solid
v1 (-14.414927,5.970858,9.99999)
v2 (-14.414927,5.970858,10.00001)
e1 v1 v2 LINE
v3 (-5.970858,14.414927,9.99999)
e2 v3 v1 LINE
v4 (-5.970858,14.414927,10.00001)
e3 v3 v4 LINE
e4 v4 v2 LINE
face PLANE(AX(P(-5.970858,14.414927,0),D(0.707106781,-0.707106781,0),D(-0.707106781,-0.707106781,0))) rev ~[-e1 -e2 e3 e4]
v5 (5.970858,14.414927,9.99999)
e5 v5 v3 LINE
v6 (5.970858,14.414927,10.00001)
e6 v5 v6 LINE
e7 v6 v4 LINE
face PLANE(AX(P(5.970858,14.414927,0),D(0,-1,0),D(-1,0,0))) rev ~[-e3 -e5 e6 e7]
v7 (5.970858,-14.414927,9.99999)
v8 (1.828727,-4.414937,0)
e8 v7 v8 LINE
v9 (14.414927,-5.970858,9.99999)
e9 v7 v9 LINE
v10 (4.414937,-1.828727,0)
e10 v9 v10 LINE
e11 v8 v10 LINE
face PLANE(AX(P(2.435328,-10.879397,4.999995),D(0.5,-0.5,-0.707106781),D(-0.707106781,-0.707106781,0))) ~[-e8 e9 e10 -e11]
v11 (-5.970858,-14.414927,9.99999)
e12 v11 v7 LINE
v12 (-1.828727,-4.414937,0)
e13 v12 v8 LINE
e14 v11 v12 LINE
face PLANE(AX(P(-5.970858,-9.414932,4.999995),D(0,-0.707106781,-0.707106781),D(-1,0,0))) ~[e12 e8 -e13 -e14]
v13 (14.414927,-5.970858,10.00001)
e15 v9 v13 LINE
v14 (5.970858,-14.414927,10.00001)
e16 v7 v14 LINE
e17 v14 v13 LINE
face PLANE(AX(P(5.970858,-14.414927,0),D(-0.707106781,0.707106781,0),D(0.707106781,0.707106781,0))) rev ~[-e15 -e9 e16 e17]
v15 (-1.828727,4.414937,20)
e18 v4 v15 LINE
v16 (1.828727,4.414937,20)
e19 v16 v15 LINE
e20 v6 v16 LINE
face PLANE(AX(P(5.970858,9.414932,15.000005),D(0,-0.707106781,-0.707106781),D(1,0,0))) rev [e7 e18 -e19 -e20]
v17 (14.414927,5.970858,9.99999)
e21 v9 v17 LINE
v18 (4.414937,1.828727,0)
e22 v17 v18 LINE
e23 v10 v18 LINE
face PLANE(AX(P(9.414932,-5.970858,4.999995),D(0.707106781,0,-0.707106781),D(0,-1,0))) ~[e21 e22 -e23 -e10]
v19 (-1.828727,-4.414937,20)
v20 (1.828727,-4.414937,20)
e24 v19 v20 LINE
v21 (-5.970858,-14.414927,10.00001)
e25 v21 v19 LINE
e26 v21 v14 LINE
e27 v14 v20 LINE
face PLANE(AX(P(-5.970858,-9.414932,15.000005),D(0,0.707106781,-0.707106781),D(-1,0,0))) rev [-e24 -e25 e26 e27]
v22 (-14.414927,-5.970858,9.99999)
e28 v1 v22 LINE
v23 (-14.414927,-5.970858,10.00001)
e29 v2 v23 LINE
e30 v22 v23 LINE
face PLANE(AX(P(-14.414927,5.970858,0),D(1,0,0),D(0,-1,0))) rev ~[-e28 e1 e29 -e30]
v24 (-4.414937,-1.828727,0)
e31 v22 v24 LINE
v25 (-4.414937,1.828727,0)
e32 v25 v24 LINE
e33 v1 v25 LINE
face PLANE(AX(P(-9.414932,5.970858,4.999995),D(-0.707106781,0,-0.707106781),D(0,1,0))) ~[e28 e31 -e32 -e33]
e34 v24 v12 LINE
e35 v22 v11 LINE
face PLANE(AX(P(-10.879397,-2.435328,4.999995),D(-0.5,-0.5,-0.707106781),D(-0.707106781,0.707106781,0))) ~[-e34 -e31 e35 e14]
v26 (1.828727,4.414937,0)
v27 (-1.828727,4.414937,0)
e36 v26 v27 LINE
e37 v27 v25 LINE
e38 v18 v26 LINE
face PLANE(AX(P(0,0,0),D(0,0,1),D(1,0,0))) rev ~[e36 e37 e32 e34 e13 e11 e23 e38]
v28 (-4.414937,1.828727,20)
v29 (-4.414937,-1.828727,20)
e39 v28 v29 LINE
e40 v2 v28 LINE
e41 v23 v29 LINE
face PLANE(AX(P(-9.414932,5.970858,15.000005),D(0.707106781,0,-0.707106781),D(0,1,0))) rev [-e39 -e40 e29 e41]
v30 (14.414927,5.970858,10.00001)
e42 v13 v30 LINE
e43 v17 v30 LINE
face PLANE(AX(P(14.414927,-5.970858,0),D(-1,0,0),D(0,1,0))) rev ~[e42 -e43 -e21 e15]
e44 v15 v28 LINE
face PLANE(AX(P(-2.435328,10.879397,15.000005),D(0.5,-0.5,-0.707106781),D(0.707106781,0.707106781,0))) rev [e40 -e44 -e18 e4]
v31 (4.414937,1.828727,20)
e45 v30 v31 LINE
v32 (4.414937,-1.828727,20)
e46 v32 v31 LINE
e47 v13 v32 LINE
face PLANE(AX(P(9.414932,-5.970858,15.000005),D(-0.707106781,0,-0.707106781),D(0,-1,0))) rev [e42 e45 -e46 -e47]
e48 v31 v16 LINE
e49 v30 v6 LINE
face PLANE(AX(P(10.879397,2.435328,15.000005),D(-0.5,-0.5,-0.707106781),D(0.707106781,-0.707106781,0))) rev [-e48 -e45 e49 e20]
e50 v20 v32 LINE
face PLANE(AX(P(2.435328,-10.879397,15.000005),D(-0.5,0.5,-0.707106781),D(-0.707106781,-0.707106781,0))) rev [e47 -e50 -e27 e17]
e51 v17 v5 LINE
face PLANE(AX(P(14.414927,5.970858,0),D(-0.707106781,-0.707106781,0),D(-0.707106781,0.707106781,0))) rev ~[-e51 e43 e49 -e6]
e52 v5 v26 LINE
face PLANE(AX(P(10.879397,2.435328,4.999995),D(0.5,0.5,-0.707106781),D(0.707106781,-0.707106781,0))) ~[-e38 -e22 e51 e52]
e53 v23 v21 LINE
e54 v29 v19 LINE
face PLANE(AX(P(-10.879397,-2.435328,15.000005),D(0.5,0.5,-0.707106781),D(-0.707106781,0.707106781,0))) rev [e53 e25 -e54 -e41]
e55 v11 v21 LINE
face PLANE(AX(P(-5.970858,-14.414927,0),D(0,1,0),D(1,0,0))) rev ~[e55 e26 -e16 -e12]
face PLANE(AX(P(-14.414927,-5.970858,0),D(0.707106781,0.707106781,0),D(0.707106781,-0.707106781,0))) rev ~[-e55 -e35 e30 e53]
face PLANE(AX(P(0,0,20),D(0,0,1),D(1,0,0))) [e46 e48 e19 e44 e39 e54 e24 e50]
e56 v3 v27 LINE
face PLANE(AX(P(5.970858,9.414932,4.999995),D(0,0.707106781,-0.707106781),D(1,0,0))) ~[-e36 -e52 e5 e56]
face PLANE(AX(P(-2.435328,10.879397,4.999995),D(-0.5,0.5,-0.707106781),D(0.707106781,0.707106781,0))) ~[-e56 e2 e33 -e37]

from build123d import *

# Parameters (mm, degrees)
F1_DEPTH = 20
F2_SIZE  = 9.99999


# Not quite as in the source:
# - a fillet or chamfer is up to 0.001 mm smaller than in the source, because OpenCascade refuses the exact size


with BuildPart() as f1:
    # F0 (on Top) → F1 (new body)
    with BuildSketch(Plane.XY):
        Polygon((-5.9708582602, -14.4149269909), (5.9708582602, -14.4149269909), (11.5348123973, -8.8509728538), (14.4149269909, -3.8624680462), (14.4149269909, 3.8624680462), (11.5348123973, 8.8509728538), (5.9708582602, 14.4149269909), (-5.9708582602, 14.4149269909), (-11.5348123973, 8.8509728538), (-14.4149269909, 3.8624680462), (-14.4149269909, -3.8624680462), (-11.5348123973, -8.8509728538), align=None)
        Polygon((-14.4149269909, -5.9708582602), (-11.5348123973, -8.8509728538), (-14.4149269909, -3.8624680462), align=None)
        Polygon((-14.4149269909, 5.9708582602), (-14.4149269909, 3.8624680462), (-11.5348123973, 8.8509728538), align=None)
        Polygon((14.4149269909, -3.8624680462), (11.5348123973, -8.8509728538), (14.4149269909, -5.9708582602), align=None)
        Polygon((11.5348123973, 8.8509728538), (14.4149269909, 3.8624680462), (14.4149269909, 5.9708582602), align=None)
    extrude(amount=F1_DEPTH)

    # F2 (size 10 in the source; OpenCascade refuses exactly that, so slightly less here)
    f2_edges = [f1.edges().sort_by_distance(p)[0] for p in [
        (0, 14.414927, 20),
        (-10.192893, 10.192893, 20),
        (-14.414927, 0, 20),
        (-10.192893, -10.192893, 20),
        (0, -14.414927, 20),
        (10.192893, -10.192893, 20),
        (14.414927, 0, 20),
        (10.192893, 10.192893, 20),
        (0, 14.414927, 0),
        (-10.192893, 10.192893, 0),
        (-14.414927, 0, 0),
        (-10.192893, -10.192893, 0),
        (0, -14.414927, 0),
        (10.192893, -10.192893, 0),
        (14.414927, 0, 0),
        (10.192893, 10.192893, 0),
    ]]
    chamfer(f2_edges, length=F2_SIZE)


solid = f1.part
